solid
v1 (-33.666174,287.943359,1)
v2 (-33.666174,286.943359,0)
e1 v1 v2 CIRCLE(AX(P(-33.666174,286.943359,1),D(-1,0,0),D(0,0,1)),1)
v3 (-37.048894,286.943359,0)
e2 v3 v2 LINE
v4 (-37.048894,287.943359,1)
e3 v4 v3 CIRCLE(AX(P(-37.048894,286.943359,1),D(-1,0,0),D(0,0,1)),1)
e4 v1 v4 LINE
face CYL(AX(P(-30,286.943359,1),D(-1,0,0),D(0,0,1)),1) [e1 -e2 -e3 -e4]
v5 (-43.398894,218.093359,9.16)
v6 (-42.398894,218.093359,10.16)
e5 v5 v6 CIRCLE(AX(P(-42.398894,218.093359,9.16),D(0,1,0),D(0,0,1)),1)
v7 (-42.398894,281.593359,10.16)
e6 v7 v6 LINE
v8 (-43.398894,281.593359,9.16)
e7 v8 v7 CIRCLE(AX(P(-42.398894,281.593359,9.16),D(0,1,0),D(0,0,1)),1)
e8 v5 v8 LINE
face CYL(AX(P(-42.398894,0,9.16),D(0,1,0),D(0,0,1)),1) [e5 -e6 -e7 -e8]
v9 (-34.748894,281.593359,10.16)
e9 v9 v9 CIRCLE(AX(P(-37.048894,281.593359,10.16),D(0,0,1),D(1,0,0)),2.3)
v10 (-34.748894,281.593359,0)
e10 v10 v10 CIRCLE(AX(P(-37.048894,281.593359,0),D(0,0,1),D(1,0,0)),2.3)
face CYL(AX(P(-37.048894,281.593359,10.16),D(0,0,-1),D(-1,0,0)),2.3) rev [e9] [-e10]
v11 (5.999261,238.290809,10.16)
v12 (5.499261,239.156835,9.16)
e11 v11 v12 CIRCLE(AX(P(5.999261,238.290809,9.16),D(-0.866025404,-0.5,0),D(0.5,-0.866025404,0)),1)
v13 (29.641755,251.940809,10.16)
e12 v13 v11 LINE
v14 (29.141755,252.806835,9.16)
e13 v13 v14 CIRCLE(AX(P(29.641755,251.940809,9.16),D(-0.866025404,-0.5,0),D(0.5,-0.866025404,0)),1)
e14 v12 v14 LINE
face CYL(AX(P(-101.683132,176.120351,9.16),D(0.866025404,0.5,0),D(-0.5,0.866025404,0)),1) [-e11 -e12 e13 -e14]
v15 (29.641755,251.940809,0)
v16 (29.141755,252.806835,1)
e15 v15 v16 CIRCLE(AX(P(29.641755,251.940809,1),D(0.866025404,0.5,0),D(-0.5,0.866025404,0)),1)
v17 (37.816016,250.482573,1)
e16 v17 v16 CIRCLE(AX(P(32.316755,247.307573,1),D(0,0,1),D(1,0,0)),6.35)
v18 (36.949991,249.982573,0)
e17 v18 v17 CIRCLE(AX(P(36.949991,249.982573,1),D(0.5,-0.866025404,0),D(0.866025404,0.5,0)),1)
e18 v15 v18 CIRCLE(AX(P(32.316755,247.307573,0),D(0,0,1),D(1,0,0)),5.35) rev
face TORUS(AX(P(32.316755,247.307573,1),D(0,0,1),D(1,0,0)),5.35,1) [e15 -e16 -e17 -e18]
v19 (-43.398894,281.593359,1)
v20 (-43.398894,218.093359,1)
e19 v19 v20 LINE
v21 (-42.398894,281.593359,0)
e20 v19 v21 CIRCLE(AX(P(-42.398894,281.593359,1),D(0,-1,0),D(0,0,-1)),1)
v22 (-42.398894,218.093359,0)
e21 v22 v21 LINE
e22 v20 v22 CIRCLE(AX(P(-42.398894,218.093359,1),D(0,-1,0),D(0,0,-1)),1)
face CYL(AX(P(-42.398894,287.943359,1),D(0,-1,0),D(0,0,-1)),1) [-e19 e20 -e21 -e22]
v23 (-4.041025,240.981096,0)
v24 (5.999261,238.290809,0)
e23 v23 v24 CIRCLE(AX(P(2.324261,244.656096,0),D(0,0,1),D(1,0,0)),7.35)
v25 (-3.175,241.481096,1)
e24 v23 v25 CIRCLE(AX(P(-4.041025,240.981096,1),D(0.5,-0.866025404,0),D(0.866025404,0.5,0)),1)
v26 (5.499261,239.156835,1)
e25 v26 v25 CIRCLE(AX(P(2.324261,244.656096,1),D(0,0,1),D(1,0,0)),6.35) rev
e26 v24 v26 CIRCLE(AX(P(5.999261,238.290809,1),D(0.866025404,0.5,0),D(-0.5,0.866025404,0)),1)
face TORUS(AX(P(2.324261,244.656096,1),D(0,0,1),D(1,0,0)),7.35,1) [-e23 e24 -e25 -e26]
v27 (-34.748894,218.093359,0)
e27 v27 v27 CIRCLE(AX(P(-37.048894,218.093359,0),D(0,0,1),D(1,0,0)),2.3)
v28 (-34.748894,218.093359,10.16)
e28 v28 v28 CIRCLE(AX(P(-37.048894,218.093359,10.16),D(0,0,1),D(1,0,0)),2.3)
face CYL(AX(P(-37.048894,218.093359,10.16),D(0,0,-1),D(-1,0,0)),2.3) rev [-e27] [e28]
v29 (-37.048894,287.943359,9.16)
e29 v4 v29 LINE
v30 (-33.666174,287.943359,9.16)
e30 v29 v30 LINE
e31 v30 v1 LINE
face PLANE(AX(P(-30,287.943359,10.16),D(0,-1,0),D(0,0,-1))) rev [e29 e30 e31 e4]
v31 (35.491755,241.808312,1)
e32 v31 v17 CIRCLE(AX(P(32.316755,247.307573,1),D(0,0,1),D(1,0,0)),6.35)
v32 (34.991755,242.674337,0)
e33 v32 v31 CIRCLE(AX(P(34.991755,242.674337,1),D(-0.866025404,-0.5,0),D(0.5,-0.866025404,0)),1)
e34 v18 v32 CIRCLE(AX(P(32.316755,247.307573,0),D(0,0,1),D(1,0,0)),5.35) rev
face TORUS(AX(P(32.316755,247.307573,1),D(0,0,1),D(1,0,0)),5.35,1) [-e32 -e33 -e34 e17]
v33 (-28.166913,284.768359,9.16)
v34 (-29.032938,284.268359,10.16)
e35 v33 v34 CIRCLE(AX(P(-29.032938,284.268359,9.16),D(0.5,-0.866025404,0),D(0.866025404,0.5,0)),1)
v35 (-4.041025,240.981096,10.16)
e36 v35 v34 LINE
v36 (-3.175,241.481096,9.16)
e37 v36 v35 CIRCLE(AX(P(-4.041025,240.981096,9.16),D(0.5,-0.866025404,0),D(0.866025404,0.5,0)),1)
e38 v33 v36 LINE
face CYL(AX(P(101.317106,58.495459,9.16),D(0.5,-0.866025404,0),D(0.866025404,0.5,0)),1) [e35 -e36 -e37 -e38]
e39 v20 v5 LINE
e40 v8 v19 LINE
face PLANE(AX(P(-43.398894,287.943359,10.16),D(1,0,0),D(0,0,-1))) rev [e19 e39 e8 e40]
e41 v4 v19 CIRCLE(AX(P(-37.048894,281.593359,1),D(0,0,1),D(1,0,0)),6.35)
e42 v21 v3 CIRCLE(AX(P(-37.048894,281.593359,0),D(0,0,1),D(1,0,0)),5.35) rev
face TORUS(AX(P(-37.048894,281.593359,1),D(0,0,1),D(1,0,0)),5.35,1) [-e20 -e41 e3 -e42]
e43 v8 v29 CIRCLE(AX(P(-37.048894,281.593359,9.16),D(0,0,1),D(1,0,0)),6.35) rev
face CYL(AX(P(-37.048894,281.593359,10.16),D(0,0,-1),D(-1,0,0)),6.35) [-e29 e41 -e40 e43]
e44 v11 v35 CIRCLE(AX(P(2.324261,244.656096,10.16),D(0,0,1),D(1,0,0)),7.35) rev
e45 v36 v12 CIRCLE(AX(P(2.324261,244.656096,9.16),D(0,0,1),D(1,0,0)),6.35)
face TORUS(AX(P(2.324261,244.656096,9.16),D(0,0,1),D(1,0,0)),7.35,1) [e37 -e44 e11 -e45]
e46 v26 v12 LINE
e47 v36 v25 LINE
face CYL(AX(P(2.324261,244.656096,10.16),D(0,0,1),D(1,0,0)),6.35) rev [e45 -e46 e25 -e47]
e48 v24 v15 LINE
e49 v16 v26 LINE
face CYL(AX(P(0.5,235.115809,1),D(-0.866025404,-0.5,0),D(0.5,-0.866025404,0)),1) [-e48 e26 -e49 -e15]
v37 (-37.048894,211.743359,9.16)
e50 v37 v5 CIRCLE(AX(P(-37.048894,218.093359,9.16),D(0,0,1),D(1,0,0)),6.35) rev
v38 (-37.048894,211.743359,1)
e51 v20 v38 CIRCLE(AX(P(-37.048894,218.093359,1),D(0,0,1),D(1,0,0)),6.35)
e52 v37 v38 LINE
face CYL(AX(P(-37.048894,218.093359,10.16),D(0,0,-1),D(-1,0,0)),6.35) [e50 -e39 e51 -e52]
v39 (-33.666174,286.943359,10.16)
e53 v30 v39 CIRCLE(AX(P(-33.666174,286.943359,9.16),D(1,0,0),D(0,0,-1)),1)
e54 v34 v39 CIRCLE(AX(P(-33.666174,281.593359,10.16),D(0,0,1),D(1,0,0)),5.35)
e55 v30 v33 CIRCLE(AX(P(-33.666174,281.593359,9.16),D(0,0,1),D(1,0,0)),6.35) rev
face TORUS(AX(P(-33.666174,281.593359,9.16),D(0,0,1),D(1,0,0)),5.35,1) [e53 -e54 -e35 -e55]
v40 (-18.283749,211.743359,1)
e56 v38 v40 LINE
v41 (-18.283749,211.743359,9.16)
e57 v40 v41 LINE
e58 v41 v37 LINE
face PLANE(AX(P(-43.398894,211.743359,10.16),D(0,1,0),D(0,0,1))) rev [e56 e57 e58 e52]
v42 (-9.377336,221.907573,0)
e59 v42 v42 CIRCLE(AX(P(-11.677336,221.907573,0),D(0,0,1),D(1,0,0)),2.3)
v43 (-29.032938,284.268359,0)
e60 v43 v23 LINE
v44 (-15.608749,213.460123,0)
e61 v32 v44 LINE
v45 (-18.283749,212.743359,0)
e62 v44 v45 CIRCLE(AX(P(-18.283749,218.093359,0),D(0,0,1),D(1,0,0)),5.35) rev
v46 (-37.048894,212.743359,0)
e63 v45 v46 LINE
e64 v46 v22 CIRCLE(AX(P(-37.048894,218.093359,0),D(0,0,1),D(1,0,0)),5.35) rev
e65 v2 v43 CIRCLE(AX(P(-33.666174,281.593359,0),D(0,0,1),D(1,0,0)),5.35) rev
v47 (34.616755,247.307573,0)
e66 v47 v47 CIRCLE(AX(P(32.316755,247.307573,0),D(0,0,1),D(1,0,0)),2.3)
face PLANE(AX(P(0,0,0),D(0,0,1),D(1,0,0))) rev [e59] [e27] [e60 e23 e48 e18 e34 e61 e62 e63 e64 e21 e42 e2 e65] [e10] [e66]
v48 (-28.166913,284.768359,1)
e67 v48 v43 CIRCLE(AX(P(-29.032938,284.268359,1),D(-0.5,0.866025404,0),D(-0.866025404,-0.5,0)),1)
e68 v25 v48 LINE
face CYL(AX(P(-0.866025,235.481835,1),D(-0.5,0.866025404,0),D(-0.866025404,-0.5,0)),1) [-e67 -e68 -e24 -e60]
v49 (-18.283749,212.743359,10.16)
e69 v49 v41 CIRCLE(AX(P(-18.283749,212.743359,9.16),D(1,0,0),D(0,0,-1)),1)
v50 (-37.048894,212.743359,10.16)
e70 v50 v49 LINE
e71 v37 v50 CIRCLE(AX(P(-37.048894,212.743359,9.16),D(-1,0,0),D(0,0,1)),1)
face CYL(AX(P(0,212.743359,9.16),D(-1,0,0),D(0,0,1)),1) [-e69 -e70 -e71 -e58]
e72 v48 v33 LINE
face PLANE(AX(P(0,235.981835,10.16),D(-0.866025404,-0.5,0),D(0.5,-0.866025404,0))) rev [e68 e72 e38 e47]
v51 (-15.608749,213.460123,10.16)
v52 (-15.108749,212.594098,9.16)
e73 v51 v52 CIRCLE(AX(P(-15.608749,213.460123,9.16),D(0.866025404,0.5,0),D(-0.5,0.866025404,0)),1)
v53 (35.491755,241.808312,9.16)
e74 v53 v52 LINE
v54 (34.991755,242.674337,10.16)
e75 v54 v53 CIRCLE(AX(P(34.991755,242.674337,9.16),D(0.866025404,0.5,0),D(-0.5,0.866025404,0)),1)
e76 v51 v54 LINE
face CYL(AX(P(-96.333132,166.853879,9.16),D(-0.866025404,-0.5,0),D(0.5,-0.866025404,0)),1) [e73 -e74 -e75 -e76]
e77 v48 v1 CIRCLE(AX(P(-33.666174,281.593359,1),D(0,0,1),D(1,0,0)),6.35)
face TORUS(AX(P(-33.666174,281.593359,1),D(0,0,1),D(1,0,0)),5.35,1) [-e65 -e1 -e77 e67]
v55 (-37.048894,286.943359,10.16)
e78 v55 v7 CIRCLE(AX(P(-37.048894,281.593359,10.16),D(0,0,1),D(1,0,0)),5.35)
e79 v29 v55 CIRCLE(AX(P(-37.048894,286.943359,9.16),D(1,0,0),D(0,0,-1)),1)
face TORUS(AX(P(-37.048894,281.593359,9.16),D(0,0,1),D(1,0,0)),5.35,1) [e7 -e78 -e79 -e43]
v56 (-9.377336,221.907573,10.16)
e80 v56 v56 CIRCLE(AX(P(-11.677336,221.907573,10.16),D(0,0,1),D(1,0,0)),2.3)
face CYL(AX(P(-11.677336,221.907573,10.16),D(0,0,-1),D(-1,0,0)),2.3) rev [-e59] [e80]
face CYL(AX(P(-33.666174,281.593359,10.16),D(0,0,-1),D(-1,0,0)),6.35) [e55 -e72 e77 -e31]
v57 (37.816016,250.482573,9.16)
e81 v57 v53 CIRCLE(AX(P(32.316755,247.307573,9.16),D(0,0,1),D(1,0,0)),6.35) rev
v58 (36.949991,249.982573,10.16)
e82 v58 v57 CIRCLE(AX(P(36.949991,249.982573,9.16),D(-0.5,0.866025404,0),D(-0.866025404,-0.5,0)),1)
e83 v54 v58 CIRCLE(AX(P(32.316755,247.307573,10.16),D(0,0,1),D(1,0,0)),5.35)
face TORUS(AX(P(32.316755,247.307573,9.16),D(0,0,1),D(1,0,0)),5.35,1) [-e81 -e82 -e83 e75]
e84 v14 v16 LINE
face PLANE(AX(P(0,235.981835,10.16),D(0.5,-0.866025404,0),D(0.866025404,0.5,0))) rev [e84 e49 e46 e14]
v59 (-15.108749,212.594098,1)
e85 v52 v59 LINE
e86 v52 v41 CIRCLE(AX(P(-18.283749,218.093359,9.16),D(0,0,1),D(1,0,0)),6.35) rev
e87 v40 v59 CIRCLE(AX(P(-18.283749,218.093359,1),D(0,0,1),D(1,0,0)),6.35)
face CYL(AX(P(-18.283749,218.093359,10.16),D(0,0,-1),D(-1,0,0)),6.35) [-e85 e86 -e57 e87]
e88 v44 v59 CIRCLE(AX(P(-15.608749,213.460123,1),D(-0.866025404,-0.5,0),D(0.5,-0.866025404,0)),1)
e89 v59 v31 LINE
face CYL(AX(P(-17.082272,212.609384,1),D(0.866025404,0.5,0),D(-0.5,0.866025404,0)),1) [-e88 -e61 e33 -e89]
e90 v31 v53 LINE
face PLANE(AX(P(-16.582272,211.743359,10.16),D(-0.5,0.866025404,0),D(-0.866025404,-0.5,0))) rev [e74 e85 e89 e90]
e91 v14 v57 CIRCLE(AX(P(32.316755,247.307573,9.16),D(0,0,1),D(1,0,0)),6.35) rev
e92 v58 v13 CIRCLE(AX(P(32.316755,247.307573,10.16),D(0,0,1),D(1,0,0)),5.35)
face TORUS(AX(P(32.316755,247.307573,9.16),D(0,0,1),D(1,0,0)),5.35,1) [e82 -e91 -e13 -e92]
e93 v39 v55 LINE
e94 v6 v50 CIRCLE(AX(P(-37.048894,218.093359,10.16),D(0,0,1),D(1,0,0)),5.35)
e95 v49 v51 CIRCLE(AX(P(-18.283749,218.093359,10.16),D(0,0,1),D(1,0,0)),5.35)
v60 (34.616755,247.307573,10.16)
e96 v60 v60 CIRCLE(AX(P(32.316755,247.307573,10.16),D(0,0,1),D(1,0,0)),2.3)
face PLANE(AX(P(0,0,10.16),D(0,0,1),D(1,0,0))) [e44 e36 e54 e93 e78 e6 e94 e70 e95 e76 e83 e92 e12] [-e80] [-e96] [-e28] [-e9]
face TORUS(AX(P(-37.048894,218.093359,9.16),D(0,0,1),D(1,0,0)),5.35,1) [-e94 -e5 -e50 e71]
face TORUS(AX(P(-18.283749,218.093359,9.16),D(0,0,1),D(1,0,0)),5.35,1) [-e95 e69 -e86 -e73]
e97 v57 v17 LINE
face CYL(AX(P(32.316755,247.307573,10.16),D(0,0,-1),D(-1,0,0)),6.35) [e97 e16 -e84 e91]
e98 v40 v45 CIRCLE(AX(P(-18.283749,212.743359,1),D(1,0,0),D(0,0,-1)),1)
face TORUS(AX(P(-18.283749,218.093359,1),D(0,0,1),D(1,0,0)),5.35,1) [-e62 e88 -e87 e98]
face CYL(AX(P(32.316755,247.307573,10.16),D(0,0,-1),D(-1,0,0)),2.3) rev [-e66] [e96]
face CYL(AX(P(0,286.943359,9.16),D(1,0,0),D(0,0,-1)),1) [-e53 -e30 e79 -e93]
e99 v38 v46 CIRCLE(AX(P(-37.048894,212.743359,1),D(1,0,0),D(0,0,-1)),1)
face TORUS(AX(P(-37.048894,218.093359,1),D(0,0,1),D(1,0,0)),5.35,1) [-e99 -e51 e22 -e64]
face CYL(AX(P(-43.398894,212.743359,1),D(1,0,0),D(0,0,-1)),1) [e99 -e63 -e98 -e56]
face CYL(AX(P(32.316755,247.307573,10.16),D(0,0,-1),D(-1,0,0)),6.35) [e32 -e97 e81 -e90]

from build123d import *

# Parameters (mm, degrees)
SKETCH1_R           = 2.3
BOSS_EXTRUDE1_DEPTH = 10.16
FILLET1_R           = 6.35
FILLET3_R           = 1


with BuildPart() as part:
    # Sketch1 → Boss-Extrude1 (new body)
    with BuildSketch(Plane.XY):
        Polygon((0, 235.981834591), (-30, 287.943358818), (-43.398894252, 287.943358818), (-43.398894252, 211.743358818), (-16.582271537, 211.743358818), (40.991016151, 244.983311963), (34.641016151, 255.981834591), align=None)
        with Locations((-37.048894252, 218.093358818)):
            Circle(SKETCH1_R, mode=Mode.SUBTRACT)
        with Locations((-37.048894252, 281.593358818)):
            Circle(SKETCH1_R, mode=Mode.SUBTRACT)
        with Locations((32.316754837, 247.307573277)):
            Circle(SKETCH1_R, mode=Mode.SUBTRACT)
        with Locations((-11.677335675, 221.907573277)):
            Circle(SKETCH1_R, mode=Mode.SUBTRACT)
    extrude(amount=BOSS_EXTRUDE1_DEPTH)

    # Fillet1
    fillet1_edges = [part.edges().sort_by_distance(p)[0] for p in [
        (-30, 287.943358818, 5.08),
        (-16.582271537, 211.743358818, 5.08),
        (-43.398894252, 211.743358818, 5.08),
        (-43.398894252, 287.943358818, 5.08),
        (34.641016151, 255.981834591, 5.08),
        (40.991016151, 244.983311963, 5.08),
        (0, 235.981834591, 5.08),
    ]]
    fillet(fillet1_edges, radius=FILLET1_R - 0.0001)  # a hair under: the kernel refuses the full size

    # Fillet3
    fillet3_edges = [part.edges().sort_by_distance(p)[0] for p in [
        (-15.670945881, 263.124709061, 0),
        (-15.670945881, 263.124709061, 10.16),
        (17.320508076, 245.981834591, 0),
        (17.320508076, 245.981834591, 10.16),
        (10.191534663, 227.201223035, 0),
        (-27.666358183, 211.743358818, 0),
        (-43.398894252, 249.843358818, 0),
        (-35.357555363, 287.943358818, 0),
        (-41.539051602, 286.083516168, 0),
        (-41.539051602, 213.603201469, 0),
        (-16.640247059, 211.959726414, 0),
        (-30.491166474, 287.09263353, 0),
        (38.450423844, 245.66406162, 0),
        (33.960266494, 253.441242284, 0),
        (-35.357555363, 287.943358818, 10.16),
        (-43.398894252, 249.843358818, 10.16),
        (-27.666358183, 211.743358818, 10.16),
        (10.191534663, 227.201223035, 10.16),
        (-41.539051602, 286.083516168, 10.16),
        (-41.539051602, 213.603201469, 10.16),
        (-16.640247059, 211.959726414, 10.16),
        (-30.491166474, 287.09263353, 10.16),
        (38.450423844, 245.66406162, 10.16),
        (33.960266494, 253.441242284, 10.16),
        (0.680749657, 238.522426898, 0),
        (0.680749657, 238.522426898, 10.16),
    ]]
    fillet(fillet3_edges, radius=FILLET3_R)


solid = part.part
